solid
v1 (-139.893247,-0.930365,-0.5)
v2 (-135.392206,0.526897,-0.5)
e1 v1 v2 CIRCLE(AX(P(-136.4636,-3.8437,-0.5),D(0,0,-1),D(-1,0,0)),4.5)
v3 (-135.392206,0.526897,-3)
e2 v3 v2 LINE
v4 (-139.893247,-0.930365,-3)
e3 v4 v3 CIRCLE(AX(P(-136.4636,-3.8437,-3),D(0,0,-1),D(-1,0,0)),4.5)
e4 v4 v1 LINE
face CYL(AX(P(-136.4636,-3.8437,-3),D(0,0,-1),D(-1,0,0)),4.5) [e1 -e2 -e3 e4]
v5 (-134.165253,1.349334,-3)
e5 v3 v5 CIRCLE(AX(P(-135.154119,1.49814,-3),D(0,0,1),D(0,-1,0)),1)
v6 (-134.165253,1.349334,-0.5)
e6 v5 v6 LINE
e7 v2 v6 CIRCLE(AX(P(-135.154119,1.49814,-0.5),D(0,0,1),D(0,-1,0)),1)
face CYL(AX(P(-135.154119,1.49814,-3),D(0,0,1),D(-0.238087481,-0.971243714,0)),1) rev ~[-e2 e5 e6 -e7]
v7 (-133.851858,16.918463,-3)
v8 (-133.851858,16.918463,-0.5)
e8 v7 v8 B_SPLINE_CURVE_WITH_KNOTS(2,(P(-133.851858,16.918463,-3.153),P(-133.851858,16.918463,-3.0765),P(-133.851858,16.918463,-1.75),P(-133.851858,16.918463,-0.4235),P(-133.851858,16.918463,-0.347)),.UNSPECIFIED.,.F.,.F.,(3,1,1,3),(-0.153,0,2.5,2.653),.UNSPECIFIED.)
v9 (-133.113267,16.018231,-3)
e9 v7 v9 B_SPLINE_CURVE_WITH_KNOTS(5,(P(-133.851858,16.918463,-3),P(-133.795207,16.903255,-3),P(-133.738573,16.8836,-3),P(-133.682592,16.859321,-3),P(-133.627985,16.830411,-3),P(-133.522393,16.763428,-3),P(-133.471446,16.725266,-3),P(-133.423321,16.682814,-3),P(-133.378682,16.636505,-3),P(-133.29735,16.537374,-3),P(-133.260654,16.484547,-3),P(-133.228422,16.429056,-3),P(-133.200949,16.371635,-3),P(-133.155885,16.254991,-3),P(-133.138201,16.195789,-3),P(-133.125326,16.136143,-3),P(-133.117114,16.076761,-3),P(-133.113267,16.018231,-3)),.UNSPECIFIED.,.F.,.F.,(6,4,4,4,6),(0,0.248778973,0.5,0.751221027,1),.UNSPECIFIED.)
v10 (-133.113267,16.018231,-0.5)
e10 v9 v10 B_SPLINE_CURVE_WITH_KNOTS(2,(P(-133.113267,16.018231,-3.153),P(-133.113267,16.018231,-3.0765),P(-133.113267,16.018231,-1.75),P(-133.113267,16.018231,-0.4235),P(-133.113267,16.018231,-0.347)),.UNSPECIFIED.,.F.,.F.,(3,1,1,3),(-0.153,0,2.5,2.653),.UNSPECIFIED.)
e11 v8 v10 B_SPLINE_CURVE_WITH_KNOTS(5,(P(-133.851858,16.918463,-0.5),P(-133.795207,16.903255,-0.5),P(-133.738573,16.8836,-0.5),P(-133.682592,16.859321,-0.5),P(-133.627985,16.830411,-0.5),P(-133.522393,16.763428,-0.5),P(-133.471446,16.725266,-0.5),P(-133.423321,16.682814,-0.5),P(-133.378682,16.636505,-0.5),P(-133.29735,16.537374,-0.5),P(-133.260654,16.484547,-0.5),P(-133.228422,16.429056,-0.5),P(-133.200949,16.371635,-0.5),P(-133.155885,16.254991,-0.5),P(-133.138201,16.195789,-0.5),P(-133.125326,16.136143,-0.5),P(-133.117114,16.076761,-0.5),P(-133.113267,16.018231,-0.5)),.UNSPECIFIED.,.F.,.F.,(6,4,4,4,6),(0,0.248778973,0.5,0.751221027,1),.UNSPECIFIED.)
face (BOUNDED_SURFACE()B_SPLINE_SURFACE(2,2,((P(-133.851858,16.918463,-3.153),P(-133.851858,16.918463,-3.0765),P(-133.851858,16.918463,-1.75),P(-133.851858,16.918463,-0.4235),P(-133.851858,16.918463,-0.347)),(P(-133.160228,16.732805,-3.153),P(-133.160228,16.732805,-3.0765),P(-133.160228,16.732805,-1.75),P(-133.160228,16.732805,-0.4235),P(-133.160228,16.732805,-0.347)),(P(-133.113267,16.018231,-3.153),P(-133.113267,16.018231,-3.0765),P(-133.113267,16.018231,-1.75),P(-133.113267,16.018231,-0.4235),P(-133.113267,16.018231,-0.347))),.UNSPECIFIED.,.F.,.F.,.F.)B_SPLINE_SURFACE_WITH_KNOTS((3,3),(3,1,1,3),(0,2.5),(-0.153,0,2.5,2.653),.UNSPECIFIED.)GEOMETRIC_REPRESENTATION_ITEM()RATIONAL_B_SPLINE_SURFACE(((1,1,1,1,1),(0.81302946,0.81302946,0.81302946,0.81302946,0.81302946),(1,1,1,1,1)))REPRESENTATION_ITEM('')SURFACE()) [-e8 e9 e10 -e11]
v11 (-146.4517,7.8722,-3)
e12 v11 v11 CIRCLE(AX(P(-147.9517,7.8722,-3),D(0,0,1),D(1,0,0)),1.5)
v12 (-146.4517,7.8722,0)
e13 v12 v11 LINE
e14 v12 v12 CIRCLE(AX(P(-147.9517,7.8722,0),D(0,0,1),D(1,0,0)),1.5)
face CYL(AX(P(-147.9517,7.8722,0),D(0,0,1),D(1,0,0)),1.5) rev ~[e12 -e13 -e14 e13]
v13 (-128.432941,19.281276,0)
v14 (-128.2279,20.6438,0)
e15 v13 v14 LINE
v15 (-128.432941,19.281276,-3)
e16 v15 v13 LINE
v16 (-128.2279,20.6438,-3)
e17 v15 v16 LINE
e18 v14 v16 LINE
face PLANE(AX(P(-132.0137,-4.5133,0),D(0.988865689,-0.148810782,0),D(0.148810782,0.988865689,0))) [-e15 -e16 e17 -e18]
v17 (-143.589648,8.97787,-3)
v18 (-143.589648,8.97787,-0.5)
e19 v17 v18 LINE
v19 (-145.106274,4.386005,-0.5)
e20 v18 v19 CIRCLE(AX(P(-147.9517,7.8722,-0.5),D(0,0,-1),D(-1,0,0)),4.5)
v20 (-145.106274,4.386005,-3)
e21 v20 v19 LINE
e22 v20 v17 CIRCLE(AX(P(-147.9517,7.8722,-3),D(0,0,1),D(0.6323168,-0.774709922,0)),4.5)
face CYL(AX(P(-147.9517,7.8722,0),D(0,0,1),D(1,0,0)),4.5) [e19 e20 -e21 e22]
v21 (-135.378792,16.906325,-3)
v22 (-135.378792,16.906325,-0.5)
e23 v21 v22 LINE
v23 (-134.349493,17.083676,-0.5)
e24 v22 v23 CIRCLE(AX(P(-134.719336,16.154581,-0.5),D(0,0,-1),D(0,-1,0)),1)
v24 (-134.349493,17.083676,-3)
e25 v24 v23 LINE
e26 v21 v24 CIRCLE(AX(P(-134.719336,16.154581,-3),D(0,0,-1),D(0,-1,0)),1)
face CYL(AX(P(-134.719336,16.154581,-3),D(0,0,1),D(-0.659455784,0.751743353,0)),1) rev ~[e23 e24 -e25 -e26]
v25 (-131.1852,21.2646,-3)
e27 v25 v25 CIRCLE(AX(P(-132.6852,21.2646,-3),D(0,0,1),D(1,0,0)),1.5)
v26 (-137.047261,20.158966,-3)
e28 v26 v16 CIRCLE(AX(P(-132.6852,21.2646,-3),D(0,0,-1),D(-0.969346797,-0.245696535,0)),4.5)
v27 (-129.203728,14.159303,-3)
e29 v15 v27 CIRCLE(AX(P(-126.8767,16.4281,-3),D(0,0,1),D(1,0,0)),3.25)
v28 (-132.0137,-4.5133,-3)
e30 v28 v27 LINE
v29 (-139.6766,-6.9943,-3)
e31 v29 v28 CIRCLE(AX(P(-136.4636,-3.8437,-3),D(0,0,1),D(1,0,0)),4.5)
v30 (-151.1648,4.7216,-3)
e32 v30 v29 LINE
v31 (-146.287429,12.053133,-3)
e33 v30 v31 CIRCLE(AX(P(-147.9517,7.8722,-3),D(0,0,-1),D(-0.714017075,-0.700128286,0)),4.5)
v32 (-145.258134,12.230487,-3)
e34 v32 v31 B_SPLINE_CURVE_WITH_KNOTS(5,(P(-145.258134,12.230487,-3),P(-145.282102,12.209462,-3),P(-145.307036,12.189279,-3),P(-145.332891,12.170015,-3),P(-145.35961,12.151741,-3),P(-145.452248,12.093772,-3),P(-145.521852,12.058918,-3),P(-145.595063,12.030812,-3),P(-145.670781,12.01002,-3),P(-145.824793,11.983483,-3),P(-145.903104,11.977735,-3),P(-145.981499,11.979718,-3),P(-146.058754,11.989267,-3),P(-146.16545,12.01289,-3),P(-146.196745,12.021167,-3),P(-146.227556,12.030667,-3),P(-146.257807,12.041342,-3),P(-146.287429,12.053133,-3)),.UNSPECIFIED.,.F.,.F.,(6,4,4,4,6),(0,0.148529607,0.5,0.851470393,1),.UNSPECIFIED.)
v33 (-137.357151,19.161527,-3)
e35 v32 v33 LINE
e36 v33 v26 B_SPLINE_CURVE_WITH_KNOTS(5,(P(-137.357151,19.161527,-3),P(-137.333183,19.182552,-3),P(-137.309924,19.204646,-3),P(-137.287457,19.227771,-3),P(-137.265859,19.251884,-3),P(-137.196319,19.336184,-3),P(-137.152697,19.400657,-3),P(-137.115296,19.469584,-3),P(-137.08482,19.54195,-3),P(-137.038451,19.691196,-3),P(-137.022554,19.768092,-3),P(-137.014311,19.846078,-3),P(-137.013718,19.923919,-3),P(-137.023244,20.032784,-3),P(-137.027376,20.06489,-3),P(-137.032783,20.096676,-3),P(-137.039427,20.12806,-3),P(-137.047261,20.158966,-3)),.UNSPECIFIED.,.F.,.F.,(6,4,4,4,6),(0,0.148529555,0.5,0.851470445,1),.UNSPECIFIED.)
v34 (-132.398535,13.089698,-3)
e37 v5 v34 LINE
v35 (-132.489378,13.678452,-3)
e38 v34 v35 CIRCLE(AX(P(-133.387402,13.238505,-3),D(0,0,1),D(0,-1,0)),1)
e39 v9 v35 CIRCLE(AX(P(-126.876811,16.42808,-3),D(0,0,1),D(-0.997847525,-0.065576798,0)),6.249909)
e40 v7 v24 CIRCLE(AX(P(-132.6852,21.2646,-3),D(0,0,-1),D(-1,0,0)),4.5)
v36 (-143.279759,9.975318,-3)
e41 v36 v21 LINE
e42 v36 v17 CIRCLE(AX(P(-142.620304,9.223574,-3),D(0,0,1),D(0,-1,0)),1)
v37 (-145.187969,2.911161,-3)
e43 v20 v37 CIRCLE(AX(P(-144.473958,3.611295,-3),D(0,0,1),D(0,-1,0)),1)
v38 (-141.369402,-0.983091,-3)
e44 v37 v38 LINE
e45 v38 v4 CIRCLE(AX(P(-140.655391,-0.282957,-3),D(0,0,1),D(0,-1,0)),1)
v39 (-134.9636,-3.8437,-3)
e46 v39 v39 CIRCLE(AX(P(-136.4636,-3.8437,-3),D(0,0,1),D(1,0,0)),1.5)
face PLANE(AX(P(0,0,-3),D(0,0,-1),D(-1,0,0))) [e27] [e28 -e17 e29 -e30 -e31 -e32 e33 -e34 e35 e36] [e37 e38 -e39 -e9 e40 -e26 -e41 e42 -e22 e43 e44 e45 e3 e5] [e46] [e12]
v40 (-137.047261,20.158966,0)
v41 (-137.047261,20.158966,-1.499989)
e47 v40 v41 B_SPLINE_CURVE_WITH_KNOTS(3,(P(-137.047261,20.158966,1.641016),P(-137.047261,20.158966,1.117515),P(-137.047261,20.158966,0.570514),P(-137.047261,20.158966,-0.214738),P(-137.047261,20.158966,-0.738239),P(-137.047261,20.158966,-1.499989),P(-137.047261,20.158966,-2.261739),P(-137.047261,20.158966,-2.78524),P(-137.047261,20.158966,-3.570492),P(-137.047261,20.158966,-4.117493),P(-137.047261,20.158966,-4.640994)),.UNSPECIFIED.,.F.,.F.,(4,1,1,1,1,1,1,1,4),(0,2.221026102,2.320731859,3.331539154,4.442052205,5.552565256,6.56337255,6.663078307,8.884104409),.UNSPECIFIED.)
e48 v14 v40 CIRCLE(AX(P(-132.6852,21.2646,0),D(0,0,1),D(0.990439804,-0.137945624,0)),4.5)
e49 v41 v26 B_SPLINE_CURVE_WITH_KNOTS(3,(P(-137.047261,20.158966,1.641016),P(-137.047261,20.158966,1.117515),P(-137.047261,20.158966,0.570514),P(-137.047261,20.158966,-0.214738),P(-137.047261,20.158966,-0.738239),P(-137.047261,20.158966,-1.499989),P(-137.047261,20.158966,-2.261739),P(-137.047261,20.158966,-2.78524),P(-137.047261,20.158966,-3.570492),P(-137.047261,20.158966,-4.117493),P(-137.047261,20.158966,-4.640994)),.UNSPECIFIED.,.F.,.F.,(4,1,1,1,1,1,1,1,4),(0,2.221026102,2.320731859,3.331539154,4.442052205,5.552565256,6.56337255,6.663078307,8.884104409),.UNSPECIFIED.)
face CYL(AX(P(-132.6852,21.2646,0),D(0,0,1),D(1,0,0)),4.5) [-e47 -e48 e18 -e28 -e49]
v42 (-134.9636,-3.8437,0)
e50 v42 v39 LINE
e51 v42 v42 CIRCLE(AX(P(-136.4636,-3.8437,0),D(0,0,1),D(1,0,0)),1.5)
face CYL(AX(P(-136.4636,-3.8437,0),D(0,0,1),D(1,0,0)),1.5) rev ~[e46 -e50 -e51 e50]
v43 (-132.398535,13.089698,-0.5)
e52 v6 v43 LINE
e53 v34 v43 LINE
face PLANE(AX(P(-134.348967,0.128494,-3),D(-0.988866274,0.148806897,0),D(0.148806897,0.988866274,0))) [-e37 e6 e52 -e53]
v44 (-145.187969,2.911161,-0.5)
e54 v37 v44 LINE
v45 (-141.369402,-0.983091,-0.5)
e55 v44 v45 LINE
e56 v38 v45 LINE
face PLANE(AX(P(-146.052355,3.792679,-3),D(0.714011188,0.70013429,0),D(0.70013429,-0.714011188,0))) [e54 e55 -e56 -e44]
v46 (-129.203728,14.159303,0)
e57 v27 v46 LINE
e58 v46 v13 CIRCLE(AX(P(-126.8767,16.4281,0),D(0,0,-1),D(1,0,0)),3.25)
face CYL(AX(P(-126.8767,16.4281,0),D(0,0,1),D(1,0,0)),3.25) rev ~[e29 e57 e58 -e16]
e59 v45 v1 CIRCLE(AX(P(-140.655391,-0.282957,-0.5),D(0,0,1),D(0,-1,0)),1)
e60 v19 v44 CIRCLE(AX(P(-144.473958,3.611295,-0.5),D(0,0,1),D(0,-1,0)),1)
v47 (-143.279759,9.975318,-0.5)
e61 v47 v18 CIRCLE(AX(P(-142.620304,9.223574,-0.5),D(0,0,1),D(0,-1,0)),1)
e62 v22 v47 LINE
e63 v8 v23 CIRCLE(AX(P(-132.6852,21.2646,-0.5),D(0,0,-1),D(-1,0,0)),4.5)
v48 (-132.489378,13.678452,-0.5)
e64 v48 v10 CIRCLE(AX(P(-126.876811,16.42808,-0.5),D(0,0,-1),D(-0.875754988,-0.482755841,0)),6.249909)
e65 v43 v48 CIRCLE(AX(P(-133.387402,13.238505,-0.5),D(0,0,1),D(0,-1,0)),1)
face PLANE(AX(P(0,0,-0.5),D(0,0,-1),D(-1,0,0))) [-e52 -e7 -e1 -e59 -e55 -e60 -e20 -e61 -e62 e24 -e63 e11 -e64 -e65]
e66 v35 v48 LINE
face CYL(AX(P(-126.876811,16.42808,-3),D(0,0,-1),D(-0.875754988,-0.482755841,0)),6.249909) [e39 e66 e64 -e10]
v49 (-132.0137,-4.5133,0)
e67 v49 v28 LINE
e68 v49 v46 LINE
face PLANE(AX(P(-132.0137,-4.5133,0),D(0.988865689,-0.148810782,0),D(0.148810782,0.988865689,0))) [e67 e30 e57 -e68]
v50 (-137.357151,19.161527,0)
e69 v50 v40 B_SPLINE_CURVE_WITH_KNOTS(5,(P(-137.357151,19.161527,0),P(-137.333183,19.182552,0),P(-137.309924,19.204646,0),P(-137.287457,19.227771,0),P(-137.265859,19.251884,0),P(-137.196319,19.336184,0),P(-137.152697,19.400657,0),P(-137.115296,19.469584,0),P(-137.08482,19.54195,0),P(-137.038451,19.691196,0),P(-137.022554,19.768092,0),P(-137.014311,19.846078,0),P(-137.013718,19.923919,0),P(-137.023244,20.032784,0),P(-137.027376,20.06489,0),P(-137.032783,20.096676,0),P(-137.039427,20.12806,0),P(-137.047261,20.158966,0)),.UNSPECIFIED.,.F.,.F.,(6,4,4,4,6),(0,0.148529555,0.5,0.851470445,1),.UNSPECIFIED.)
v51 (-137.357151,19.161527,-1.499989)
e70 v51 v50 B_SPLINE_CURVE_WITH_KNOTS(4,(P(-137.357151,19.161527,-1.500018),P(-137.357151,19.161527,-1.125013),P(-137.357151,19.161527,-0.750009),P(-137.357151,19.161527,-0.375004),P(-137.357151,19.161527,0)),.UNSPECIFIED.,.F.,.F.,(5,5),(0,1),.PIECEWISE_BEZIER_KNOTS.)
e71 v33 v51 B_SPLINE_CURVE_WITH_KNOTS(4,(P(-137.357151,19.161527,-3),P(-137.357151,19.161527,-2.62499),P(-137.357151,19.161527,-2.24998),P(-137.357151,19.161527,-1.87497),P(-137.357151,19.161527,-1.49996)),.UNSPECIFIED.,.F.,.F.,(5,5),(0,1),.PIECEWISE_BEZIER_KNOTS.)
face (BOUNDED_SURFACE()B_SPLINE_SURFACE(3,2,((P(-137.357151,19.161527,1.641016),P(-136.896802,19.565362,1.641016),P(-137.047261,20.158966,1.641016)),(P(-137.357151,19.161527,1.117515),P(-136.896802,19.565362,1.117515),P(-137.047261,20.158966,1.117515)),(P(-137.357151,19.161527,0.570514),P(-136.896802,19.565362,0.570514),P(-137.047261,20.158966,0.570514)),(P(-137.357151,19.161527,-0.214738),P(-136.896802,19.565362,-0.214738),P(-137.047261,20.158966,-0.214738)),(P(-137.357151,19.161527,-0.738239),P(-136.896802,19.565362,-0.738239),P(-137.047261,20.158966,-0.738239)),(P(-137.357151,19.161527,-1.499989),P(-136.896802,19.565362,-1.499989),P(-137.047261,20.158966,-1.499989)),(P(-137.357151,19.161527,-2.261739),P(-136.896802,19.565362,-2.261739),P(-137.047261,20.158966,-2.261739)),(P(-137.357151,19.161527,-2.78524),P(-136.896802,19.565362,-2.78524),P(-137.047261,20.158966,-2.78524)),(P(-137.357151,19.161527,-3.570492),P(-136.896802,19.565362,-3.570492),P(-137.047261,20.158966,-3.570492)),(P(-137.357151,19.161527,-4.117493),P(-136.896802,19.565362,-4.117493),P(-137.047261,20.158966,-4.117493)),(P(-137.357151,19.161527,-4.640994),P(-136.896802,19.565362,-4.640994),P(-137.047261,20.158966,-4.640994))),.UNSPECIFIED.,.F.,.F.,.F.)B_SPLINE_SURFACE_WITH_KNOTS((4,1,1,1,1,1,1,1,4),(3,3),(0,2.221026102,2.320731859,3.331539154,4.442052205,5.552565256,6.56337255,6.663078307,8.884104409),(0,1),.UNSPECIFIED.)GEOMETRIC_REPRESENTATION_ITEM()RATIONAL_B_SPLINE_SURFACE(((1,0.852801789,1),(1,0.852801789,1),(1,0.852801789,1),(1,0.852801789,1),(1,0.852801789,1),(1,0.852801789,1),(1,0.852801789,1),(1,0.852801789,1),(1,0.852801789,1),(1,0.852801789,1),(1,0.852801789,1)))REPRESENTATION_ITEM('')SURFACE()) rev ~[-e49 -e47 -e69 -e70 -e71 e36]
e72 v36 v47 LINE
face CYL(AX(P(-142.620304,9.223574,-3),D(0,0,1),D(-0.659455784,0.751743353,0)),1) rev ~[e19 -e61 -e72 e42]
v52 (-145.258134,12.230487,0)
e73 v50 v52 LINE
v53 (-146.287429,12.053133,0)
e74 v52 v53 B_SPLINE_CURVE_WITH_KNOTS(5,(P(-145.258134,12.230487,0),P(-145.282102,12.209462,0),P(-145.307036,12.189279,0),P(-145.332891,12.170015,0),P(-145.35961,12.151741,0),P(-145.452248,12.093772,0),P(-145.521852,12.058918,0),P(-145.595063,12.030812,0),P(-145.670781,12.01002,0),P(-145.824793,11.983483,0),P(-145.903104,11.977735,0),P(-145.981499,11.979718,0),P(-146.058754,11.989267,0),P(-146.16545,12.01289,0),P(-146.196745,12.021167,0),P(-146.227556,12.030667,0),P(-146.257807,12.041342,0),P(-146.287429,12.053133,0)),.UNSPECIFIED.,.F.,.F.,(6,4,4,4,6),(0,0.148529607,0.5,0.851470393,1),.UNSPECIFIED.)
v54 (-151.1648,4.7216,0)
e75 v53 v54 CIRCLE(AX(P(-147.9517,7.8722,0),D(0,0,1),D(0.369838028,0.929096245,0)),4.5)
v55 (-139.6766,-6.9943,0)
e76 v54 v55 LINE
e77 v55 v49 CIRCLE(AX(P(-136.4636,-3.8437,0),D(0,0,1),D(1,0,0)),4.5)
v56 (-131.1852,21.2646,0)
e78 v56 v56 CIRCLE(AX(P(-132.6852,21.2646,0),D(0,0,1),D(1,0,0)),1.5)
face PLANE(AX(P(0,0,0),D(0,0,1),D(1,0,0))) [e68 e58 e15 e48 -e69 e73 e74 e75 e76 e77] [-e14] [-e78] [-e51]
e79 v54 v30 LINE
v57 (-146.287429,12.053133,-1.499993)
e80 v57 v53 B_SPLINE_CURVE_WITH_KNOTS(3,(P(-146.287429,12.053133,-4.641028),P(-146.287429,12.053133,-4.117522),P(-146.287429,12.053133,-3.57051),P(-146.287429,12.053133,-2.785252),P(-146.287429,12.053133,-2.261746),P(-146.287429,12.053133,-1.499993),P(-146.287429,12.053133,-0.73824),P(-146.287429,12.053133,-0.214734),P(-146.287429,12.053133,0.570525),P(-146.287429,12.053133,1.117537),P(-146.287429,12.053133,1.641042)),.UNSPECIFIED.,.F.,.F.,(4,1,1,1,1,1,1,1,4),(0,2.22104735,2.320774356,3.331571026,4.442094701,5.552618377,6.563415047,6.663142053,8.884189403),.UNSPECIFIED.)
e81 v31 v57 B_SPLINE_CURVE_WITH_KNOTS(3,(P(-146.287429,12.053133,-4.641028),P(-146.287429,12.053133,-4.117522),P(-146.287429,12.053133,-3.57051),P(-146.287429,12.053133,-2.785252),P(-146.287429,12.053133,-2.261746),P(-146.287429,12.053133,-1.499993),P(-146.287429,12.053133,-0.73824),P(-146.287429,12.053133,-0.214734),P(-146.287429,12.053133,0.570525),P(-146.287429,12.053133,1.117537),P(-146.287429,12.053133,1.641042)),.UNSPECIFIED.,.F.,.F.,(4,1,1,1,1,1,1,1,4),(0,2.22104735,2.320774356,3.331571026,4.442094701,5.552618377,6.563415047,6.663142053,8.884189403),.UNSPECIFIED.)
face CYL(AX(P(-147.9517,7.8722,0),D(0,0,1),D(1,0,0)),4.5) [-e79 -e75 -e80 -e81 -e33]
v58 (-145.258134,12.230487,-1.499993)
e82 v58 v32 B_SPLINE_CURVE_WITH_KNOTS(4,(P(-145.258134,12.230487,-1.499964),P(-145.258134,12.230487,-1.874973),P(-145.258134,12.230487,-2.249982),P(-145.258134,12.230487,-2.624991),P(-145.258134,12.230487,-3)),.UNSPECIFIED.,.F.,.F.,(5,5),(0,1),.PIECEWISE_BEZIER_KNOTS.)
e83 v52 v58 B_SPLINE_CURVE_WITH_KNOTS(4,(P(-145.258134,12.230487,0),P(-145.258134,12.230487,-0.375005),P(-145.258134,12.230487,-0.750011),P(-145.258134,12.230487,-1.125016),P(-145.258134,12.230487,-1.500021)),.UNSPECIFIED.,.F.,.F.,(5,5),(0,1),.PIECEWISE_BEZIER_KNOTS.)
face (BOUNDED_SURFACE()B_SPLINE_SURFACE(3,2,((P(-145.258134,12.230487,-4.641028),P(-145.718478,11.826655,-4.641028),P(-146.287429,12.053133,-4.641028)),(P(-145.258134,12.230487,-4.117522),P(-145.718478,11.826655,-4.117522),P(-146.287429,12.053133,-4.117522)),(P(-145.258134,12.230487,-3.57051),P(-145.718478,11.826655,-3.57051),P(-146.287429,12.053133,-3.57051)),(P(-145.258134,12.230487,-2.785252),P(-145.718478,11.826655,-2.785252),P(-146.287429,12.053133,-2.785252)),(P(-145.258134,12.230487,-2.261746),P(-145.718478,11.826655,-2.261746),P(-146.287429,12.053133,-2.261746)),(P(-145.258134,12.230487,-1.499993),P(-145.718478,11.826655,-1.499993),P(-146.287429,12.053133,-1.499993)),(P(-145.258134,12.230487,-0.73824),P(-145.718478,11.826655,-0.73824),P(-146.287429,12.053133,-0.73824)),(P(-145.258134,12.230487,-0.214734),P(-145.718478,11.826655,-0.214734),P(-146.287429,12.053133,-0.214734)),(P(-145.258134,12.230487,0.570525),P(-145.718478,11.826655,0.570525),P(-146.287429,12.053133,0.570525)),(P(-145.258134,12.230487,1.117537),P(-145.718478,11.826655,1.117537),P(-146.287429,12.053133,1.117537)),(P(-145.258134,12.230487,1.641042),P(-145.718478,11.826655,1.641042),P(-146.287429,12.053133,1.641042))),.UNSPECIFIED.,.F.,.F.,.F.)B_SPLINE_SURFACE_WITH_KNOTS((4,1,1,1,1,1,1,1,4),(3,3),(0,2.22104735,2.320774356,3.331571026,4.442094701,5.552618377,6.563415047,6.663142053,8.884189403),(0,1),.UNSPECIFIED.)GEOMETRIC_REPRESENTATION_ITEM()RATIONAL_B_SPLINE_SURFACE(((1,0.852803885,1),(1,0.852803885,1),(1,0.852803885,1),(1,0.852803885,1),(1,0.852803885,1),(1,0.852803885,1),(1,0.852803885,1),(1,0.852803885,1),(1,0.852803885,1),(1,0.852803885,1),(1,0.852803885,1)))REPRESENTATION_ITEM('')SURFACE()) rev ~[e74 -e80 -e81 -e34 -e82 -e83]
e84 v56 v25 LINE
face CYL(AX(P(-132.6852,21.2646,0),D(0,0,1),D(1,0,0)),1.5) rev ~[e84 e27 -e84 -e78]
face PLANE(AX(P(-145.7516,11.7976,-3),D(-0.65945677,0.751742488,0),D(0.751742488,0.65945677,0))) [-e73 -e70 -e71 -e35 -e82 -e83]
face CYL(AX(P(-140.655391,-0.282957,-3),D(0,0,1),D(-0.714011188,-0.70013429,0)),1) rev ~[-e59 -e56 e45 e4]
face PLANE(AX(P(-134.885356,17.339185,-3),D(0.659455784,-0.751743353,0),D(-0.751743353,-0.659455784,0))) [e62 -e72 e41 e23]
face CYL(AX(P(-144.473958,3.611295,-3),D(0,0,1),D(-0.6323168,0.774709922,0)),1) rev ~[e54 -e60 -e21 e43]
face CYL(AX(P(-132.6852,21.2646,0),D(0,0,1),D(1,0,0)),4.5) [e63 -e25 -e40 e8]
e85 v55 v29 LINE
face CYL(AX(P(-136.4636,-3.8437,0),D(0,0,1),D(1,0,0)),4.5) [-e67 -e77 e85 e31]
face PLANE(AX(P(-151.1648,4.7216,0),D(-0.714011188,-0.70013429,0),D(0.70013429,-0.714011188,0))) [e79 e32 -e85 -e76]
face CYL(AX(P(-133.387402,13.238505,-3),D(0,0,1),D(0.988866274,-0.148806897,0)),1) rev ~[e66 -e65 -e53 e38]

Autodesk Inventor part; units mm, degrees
ref_plane "YZ Plane" through (0, 0, 0) normal (1, 0, 0) x (0, 1, 0)
ref_plane "XZ Plane" through (0, 0, 0) normal (0, 1, 0) x (-1, 0, 0)
ref_plane "XY Plane" through (0, 0, 0) normal (0, 0, 1) x (1, 0, 0)
sketch "スケッチ1" plane through (0, 0, 0) normal (0, 0, 1) x (1, 0, 0)
  circle A0 centre (-84.1159, 33.5789) radius 1.5
  circle A1 centre (-105.2485, 37.922) radius 1.5
  circle A2 centre (-132.6852, 21.2646) radius 1.5
  circle A3 centre (-77.8119, 54.5794) radius 1.5
  circle A4 centre (-112.1063, 12.5661) radius 1.5
  circle A5 centre (-60.4494, 64.5064) radius 1.5
  circle A6 centre (-64.4423, 49.0046) radius 1.5
  circle A7 centre (-44.4492, 64.0137) radius 1.5
  line L0 (-44.233, 71.0354) -> (-60.2332, 71.5281)
  arc A8 (-60.2332, 71.5281) -> (-64.0951, 70.5113) centre (-60.4494, 64.5064) ccw
  line L1 (-64.0951, 70.5113) -> (-153.1544, 16.4415)
  arc A9 (-153.1544, 16.4415) -> (-154.1888, 0.0236) centre (-147.9517, 7.8722) ccw
  line L2 (-154.1888, 0.0236) -> (-141.4408, -10.1069)
  arc A10 (-141.4408, -10.1069) -> (-131.6607, -10.2415) centre (-136.4636, -3.8437) ccw
  arc A11 (-40.2316, 58.3956) -> (-44.233, 71.0354) centre (-44.4492, 64.0137) ccw
  circle A12 centre (-147.9517, 7.8722) radius 1.5
  circle A13 centre (-136.4636, -3.8437) radius 1.5
  circle A14 centre (-132.6852, 21.2646) radius 1.5
  circle A15 centre (-132.6852, 21.2646) radius 4.5
  circle A16 centre (-147.9517, 7.8722) radius 4.5
  circle A17 centre (-136.4636, -3.8437) radius 1.5
  circle A18 centre (-136.4636, -3.8437) radius 4.5
  line L3 (-151.1648, 4.7216) -> (-139.6766, -6.9943)
  line L4 (-132.0137, -4.5133) -> (-128.2279, 20.6438)
  line L5 (-135.6527, 24.6475) -> (-150.9193, 11.255)
  circle A19 centre (-112.1063, 12.5661) radius 4.5
  point P0 (0, 0)
  point P1 (0, 0)
  point P2 (-128.2353, 20.595)
  dimension "d0" = 9
  dimension "d1" = 9
  dimension "d2" = 9
  dimension "d5" = 9
extrude "押し出し1" add sketch "スケッチ1" against normal blind 3 contours A15 L4 A18 L3 A16 L5 | A16 | A18
sketch "スケッチ2" plane through (0, 0, 0) normal (0, 0, 1) x (1, 0, 0)
  circle A0 centre (-142.0156, -13.6386) radius 1.5
  line L0 (-193.8461, -47.1997) -> (-168.4977, -27.8921)
  arc A1 (-162.0848, -31.6046) -> (-168.4977, -27.8921) centre (-166.0653, -31.0855) ccw
  line L1 (-162.0848, -31.6046) -> (-161.5284, -29.669)
  arc A2 (-161.365, -29.2693) -> (-161.5284, -29.669) centre (-159.6062, -30.2215) ccw
  line L2 (-161.365, -29.2693) -> (-154.7883, -17.1215)
  arc A3 (-151.2707, -19.0259) -> (-154.7883, -17.1215) centre (-153.0295, -18.0737) ccw
  line L3 (-151.2707, -19.0259) -> (-154.509, -25.0074)
  arc A4 (-154.509, -25.0074) -> (-153.0293, -26.2832) centre (-153.6296, -25.4835) ccw
  line L4 (-153.0293, -26.2832) -> (-128.1569, -7.6112)
  arc A5 (-128.1569, -7.6112) -> (-126.988, -5.6349) centre (-129.958, -5.212) ccw
  line L5 (-126.988, -5.6349) -> (-123.9066, 16.0052)
  arc A6 (-123.9066, 16.0052) -> (-127.0915, 19.4204) centre (-126.8767, 16.4281) ccw
  line L6 (-127.0915, 19.4204) -> (-130.5344, 19.1732)
  arc A7 (-134.5152, 18.8875) -> (-130.5344, 19.1732) centre (-132.6852, 21.2646) ccw
  line L7 (-134.5152, 18.8875) -> (-148.6695, 17.8715)
  arc A8 (-148.6695, 17.8715) -> (-157.1727, 11.806) centre (-147.9517, 7.8722) ccw
  line L8 (-157.1727, 11.806) -> (-166.1369, -9.2063)
  line L9 (-166.1369, -9.2063) -> (-193.8461, -47.1997)
  circle A9 centre (-126.8767, 16.4281) radius 1.5
  circle A10 centre (-158.5928, -9.2025) radius 1.5
  arc A11 (-128.5265, 10.8915) -> (-134.9494, 9.8931) centre (-131.7379, 10.3923) ccw
  arc A12 (-133.9759, -5.9529) -> (-128.5265, 10.8915) centre (-147.9517, 7.8722) ccw
  arc A13 (-138.597, -1.3817) -> (-133.9759, -5.9529) centre (-136.2864, -3.6673) ccw
  arc A14 (-138.597, -1.3817) -> (-134.9494, 9.8931) centre (-147.9517, 7.8722) ccw
  circle A15 centre (-147.9517, 7.8722) radius 4.025
  arc A16 (-150.9193, 11.255) -> (-151.1648, 4.7216) centre (-147.9517, 7.8722) ccw projected
  line L10 (-151.1648, 4.7216) -> (-139.6766, -6.9943) projected
  arc A17 (-139.6766, -6.9943) -> (-132.0137, -4.5133) centre (-136.4636, -3.8437) ccw projected
  line L11 (-132.0137, -4.5133) -> (-128.2353, 20.595) projected
  arc A18 (-128.2353, 20.595) -> (-135.6527, 24.6475) centre (-132.6852, 21.2646) ccw projected
  line L12 (-135.6527, 24.6475) -> (-150.9193, 11.255) projected
  circle A19 centre (-132.6852, 21.2646) radius 1.5 projected
  circle A20 centre (-147.9517, 7.8722) radius 1.5 projected
  circle A21 centre (-136.4636, -3.8437) radius 1.5 projected
  circle A22 centre (-126.8767, 16.4281) radius 3.25
  point P0 (0, 0)
  point P1 (0, 0)
  dimension "d6" = 6.5
extrude "押し出し2" cut sketch "スケッチ2" against normal blind 10 contours A22 L5 A6 L6 | L6 A6 L5 A22 L11 | L11 A22 | A9
sketch "スケッチ3" plane through (0, 0, -3) normal (0, 0, -1) x (-1, 0, 0)
  arc A0 (129.2038, 14.1593) -> (128.433, 19.2812) centre (126.8767, 16.4281) ccw projected
  line L0 (129.2038, 14.1593) -> (132.0137, -4.5133) projected
  arc A1 (132.0137, -4.5133) -> (139.6766, -6.9943) centre (136.4636, -3.8437) ccw projected
  line L1 (139.6766, -6.9943) -> (151.1648, 4.7216) projected
  arc A2 (151.1648, 4.7216) -> (150.9193, 11.255) centre (147.9517, 7.8722) ccw projected
  line L2 (150.9193, 11.255) -> (135.6527, 24.6475) projected
  arc A3 (135.6527, 24.6475) -> (128.2353, 20.595) centre (132.6852, 21.2646) ccw projected
  line L3 (128.2353, 20.595) -> (128.433, 19.2812) projected
  circle A4 centre (132.6852, 21.2646) radius 1.5 projected
  circle A5 centre (147.9517, 7.8722) radius 1.5 projected
  circle A6 centre (136.4636, -3.8437) radius 1.5 projected
  line L4 (149.0228, 6.822) -> (137.5346, -4.8939)
  arc A7 (134.9803, -4.0669) -> (137.5346, -4.8939) centre (136.4636, -3.8437) ccw
  line L5 (134.9803, -4.0669) -> (132.3502, 13.4109)
  arc A8 (132.3502, 13.4109) -> (131.2198, 20.9225) centre (126.8767, 16.4281) ccw
  line L6 (131.2198, 20.9225) -> (131.2019, 21.0414)
  arc A9 (133.6744, 22.3923) -> (131.2019, 21.0414) centre (132.6852, 21.2646) ccw
  line L7 (133.6744, 22.3923) -> (148.9409, 8.9998)
  arc A10 (149.0228, 6.822) -> (148.9409, 8.9998) centre (147.9517, 7.8722) ccw
  circle A11 centre (132.6852, 21.2646) radius 1.5 projected
  circle A12 centre (132.6852, 21.2646) radius 4.5
  circle A13 centre (147.9517, 7.8722) radius 4.5
  circle A14 centre (136.4636, -3.8437) radius 1.5 projected
  circle A15 centre (136.4636, -3.8437) radius 4.5
  point P0 (0, 0)
  point P1 (134.349, 0.1285)
  point P2 (140.505, -1.8646)
  point P3 (146.0523, 3.7927)
  point P4 (145.7516, 11.7976)
  point P5 (136.8637, 19.5944)
  point P6 (133.1164, 16.7854)
  dimension "d9" = 3
extrude "押し出し3" cut sketch "スケッチ3" against normal blind 2.5 contours A12 L7 A13 L4 A15 L5 A8
sketch "スケッチ4" plane through (0, 0, -3) normal (0, 0, -1) x (-1, 0, 0)
  line L0 (140.505, -1.8646) -> (146.0523, 3.7927) projected
  arc A0 (145.7516, 11.7976) -> (146.0523, 3.7927) centre (147.9517, 7.8722) ccw projected
  line L1 (145.7516, 11.7976) -> (136.8637, 19.5944) projected
  arc A1 (133.1164, 16.7854) -> (136.8637, 19.5944) centre (132.6852, 21.2646) ccw projected
  arc A2 (132.3502, 13.4109) -> (133.1164, 16.7854) centre (126.8767, 16.4281) ccw projected
  line L2 (132.3502, 13.4109) -> (134.349, 0.1285) projected
  arc A3 (140.505, -1.8646) -> (134.349, 0.1285) centre (136.4636, -3.8437) ccw projected
  circle A4 centre (136.4636, -3.8437) radius 1.5 projected
  circle A5 centre (147.9517, 7.8722) radius 1.5 projected
  circle A6 centre (132.6852, 21.2646) radius 1.5 projected
  line L3 (151.1648, 4.7216) -> (139.6766, -6.9943) projected
  arc A7 (132.0137, -4.5133) -> (139.6766, -6.9943) centre (136.4636, -3.8437) ccw projected
  line L4 (132.0137, -4.5133) -> (129.2038, 14.1593) projected
  arc A8 (129.2038, 14.1593) -> (128.433, 19.2812) centre (126.8767, 16.4281) ccw projected
  line L5 (128.433, 19.2812) -> (128.2353, 20.595) projected
  arc A9 (135.6527, 24.6475) -> (128.2353, 20.595) centre (132.6852, 21.2646) ccw projected
  line L6 (135.6527, 24.6475) -> (150.9193, 11.255) projected
  arc A10 (151.1648, 4.7216) -> (150.9193, 11.255) centre (147.9517, 7.8722) ccw projected
  line L7 (147.9517, 7.8722) -> (132.6852, 21.2646) construction
  line L8 (148.9409, 8.9998) -> (133.6744, 22.3923)
  line L9 (131.696, 20.137) -> (146.9626, 6.7446)
  arc A11 (146.9626, 6.7446) -> (148.9409, 8.9998) centre (147.9517, 7.8722) ccw
  arc A12 (133.6744, 22.3923) -> (131.696, 20.137) centre (132.6852, 21.2646) ccw
  circle A13 centre (132.6852, 21.2646) radius 4.5
  circle A14 centre (147.9517, 7.8722) radius 4.5
  point P0 (0, 0)
  point P1 (140.3185, 14.5684)
  point P2 (145.7516, 11.7976)
  point P3 (135.6527, 24.6475)
  point P4 (134.8854, 17.3392)
  point P5 (143.7732, 9.5424)
  dimension "d12" = 3
extrude "押し出し4" cut sketch "スケッチ4" against normal blind 10 contours L1 A13 L6 A14
extrude "押し出し5" add sketch "スケッチ4" against normal blind 3 contours L9 A1 L1 A0
sketch "スケッチ5" plane through (0, 0, -3) normal (0, 0, -1) x (-1, 0, 0)
  point P0 (0, 0)
fillet "フィレット1" radius 1 7 edges at (-134.8854, 17.3392, -1.75) (-133.1164, 16.7854, -1.75) (-132.3502, 13.4109, -1.75) (-143.7732, 9.5424, -1.75) (-146.0523, 3.7927, -1.75) (-140.505, -1.8646, -1.75) (-134.349, 0.1285, -1.75)
fillet "フィレット2" radius 1 2 edges at (-136.8637, 19.5944, -1.5) (-145.7516, 11.7976, -1.5)
properties part number "アーム ツインアーム先端押さえ" material "ポリカーボネート、クリア"
